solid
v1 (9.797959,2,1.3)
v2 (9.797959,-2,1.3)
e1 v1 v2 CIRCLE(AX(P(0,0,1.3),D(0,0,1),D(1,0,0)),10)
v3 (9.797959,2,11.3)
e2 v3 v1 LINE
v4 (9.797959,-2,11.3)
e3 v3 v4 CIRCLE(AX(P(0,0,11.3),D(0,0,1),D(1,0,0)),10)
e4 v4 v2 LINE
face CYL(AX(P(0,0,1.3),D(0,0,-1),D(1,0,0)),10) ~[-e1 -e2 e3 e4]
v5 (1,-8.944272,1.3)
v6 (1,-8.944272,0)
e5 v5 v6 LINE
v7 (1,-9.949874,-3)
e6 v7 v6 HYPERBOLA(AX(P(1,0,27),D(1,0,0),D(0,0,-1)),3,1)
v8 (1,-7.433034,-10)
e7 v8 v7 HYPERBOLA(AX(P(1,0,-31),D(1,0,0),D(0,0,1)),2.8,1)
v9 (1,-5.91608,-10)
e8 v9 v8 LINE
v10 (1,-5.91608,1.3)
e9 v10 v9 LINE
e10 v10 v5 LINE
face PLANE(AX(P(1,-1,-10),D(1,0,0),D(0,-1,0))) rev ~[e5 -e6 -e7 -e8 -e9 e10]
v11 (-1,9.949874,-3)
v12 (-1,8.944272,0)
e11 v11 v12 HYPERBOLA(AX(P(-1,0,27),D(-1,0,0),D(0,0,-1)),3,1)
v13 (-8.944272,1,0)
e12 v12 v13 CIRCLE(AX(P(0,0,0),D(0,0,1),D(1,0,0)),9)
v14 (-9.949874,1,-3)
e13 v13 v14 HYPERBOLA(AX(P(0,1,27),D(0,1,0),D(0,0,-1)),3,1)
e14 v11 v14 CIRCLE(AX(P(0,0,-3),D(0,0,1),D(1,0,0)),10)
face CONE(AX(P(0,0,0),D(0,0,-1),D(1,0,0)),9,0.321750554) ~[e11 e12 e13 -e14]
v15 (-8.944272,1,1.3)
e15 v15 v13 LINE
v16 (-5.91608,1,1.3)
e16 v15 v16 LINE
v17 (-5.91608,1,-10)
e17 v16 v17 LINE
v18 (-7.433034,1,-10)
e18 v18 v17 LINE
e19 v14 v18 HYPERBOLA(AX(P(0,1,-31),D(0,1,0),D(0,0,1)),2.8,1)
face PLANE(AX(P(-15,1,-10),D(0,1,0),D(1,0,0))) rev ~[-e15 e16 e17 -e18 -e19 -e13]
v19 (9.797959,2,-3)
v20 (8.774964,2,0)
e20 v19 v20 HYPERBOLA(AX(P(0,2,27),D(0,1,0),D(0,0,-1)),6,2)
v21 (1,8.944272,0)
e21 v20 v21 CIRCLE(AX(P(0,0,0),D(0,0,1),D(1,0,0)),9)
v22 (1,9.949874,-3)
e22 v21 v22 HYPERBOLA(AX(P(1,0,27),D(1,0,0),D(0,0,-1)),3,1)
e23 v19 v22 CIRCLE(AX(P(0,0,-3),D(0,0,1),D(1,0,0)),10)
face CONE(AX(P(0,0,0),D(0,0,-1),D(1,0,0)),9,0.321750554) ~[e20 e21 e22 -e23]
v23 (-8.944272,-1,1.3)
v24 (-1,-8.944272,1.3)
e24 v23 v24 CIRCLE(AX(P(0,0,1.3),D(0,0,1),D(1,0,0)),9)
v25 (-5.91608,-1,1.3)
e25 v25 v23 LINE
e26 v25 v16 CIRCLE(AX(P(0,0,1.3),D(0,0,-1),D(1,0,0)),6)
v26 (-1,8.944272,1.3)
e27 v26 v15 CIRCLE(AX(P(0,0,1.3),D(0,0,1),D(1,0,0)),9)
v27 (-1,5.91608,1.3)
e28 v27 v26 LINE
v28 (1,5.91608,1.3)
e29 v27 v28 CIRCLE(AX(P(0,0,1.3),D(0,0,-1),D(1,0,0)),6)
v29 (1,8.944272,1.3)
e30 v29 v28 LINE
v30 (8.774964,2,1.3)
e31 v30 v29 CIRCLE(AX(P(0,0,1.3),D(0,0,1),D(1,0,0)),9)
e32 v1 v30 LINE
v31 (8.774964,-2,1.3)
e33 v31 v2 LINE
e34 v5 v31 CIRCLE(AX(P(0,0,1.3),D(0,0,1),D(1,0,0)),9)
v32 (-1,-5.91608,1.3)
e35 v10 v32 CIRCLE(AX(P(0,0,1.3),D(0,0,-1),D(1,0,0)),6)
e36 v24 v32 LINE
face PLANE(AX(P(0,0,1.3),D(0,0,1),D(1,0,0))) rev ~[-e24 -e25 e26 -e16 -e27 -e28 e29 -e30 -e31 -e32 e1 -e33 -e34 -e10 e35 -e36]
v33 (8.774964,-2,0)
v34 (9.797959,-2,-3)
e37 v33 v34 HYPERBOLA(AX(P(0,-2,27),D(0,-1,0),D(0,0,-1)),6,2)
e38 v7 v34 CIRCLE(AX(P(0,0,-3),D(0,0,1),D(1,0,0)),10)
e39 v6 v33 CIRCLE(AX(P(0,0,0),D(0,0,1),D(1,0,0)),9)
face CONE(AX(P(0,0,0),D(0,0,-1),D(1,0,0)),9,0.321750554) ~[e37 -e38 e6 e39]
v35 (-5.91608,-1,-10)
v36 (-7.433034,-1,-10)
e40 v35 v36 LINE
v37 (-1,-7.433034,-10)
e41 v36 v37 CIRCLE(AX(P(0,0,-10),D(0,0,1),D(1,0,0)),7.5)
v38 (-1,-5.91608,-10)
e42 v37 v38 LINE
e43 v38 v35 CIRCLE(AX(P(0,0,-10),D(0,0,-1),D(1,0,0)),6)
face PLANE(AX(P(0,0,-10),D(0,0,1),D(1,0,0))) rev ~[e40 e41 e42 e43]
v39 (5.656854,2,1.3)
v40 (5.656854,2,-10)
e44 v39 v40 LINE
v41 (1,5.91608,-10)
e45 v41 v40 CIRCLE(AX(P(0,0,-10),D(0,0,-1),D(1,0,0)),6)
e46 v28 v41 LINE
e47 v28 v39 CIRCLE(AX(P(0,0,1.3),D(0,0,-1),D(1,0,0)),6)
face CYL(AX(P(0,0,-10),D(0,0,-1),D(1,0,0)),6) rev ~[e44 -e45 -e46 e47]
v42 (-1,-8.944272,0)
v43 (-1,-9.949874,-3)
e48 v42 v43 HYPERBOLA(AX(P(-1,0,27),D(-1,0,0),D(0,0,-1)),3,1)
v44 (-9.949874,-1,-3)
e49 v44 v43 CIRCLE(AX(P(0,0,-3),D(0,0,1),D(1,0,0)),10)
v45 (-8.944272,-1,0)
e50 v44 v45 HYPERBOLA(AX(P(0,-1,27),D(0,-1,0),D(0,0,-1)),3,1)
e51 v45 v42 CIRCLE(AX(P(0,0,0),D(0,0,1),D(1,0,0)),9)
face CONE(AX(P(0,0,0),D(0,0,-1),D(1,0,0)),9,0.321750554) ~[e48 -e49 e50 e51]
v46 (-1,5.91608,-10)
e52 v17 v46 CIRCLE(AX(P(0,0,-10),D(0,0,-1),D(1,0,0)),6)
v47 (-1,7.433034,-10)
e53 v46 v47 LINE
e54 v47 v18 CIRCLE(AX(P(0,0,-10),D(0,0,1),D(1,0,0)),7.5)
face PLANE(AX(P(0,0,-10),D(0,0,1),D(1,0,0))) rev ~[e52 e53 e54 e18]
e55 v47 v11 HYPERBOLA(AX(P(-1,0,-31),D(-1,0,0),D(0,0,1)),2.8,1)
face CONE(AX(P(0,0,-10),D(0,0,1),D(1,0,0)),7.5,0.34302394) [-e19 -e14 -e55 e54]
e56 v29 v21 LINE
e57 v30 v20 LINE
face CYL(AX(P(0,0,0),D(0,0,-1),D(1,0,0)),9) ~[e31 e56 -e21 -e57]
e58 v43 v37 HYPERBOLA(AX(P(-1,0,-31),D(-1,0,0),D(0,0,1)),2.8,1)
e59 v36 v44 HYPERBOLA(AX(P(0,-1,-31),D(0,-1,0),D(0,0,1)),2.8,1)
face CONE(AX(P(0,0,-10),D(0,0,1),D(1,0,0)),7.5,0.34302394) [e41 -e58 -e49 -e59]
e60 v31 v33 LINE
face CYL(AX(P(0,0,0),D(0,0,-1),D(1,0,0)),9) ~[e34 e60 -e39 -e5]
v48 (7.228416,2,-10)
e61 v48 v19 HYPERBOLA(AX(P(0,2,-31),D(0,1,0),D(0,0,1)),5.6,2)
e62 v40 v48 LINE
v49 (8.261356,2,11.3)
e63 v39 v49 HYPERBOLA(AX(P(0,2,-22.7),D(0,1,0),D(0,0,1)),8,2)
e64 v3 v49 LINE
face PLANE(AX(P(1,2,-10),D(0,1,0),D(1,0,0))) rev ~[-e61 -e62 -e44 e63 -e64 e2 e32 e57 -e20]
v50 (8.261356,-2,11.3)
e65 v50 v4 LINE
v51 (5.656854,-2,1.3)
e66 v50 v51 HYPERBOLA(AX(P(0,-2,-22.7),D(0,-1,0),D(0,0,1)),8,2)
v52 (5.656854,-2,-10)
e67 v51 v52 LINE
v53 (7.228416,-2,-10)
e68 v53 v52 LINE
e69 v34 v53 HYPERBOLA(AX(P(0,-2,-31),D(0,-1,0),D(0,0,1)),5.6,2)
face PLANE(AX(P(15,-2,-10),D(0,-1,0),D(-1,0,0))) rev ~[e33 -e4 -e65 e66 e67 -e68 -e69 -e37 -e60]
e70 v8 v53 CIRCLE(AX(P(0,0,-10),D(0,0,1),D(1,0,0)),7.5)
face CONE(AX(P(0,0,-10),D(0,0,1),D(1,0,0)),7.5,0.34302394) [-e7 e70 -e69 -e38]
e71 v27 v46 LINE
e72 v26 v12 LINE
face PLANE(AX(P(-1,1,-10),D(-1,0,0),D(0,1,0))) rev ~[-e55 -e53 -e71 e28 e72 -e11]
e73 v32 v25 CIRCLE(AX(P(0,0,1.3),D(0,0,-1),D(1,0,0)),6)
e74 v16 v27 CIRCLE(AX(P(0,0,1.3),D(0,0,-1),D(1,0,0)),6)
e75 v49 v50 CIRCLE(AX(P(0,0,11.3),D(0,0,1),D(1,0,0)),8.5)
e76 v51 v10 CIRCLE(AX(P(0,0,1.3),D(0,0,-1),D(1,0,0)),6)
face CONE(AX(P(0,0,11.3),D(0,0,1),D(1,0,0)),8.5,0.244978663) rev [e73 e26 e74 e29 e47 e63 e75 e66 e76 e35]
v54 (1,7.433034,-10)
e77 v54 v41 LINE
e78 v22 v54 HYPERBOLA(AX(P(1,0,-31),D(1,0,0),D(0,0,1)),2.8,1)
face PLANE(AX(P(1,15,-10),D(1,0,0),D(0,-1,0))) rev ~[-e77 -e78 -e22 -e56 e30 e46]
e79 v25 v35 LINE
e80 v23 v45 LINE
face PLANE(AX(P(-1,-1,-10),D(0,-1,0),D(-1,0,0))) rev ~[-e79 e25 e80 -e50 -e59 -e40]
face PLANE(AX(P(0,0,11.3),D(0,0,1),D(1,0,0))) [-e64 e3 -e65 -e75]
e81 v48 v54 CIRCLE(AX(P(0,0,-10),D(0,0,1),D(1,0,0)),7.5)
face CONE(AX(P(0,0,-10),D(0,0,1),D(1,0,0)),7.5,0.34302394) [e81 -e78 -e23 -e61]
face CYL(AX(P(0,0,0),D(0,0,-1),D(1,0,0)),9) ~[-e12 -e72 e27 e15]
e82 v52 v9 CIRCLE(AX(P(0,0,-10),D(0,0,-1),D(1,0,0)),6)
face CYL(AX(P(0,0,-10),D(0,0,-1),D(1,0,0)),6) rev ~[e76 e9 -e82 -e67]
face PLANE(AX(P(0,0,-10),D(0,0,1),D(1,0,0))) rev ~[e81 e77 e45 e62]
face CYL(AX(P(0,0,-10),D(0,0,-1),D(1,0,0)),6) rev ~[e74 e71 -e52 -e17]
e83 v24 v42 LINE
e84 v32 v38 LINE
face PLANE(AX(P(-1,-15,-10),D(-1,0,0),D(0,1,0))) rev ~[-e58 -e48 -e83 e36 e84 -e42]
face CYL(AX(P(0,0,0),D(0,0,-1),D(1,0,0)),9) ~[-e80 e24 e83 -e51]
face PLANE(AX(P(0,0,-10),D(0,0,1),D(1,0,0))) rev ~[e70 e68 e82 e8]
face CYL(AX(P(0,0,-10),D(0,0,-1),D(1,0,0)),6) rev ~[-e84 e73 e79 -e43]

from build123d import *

# Parameters (mm, degrees)
F6_R       = 7.5
F3_R       = 10
F0_R       = 9
F7_FACE_R  = 10
F9_DEPTH   = 1.3
F11_R      = 10
F11_R_2    = 9
F12_DEPTH  = 10
F10_R      = 6
F14_DEPTH  = 11.3
F15_R      = 8.5
F14_FACE_R = 6
F13_W      = 2
F13_H      = 2
F17_DEPTH  = 11.3
F18_DEPTH  = 21.3010001


with BuildPart() as f7:
    # F6 (on plane+point) → F7 section 0
    with BuildSketch(Plane.XY.offset(-10)):
        Circle(F6_R)
    # F3 (on plane+point) → F7 section 1
    with BuildSketch(Plane.XY.offset(-3)):
        Circle(F3_R)
    loft()

    # F0 (on Top) → F8 section 0
    with BuildSketch(Plane.XY):
        Circle(F0_R)
    # F7_face (on face) → F8 section 1
    with BuildSketch(Plane.XY.offset(-3)):
        Circle(F7_FACE_R)
    loft()

    # F9 (add): a face of the model
    f9_faces = [f7.faces().sort_by_distance(p)[0] for p in [
        (0, 0, 0),
    ]]
    extrude(f9_faces, amount=F9_DEPTH)

    # F11 (on face) → F12 (join)
    with BuildSketch(Plane.XY.offset(1.3)):
        Circle(F11_R)
        Circle(F11_R_2, mode=Mode.SUBTRACT)
        Circle(F11_R_2)
    extrude(amount=F12_DEPTH)

    # F10 (on face) → F14 (cut, through all)
    with BuildSketch(Plane(origin=(0, 0, -10), x_dir=(1, 0, 0), z_dir=(0, 0, -1))):
        Circle(F10_R)
    extrude(amount=-F14_DEPTH, mode=Mode.SUBTRACT)

    # F15 (on face) → F16 section 0
    with BuildSketch(Plane.XY.offset(11.3)):
        Circle(F15_R)
    # F14_face (on face) → F16 section 1
    with BuildSketch(Plane(origin=(0, 0, 1.3), x_dir=(1, 0, 0), z_dir=(0, 0, -1))):
        Circle(F14_FACE_R)
    loft(mode=Mode.SUBTRACT)

    # F13 (on face) → F17 (cut, through all)
    with BuildSketch(Plane(origin=(0, 0, -10), x_dir=(1, 0, 0), z_dir=(0, 0, -1))):
        with BuildLine():
            Line((-1, 15), (-1, 7.4330343737))
            ThreePointArc((-1, 7.4330343737), (0, 7.5), (1, 7.4330343737))
            Line((1, 7.4330343737), (1, 15))
            Line((1, 15), (-1, 15))
        make_face()
        with BuildLine():
            Line((-1, 7.4330343737), (-1, 1))
            Line((-1, 1), (1, 1))
            Line((1, 1), (1, 2))
            Line((1, 2), (1, 7.4330343737))
            ThreePointArc((1, 7.4330343737), (0, 7.5), (-1, 7.4330343737))
        make_face()
        with BuildLine():
            Line((15, 1), (7.4330343737, 1))
            ThreePointArc((7.4330343737, 1), (7.4832398666, 0.5011198447), (7.5, 0))
            ThreePointArc((7.5, 0), (7.4832398666, -0.5011198447), (7.4330343737, -1))
            Line((7.4330343737, -1), (15, -1))
            Line((15, -1), (15, 1))
        make_face()
        with BuildLine():
            Line((7.4330343737, 1), (1, 1))
            Line((1, 1), (1, -1))
            Line((1, -1), (7.4330343737, -1))
            ThreePointArc((7.4330343737, -1), (7.4832398666, -0.5011198447), (7.5, 0))
            ThreePointArc((7.5, 0), (7.4832398666, 0.5011198447), (7.4330343737, 1))
        make_face()
        with BuildLine():
            Line((-7.4330343737, 1), (-15, 1))
            Line((-15, 1), (-15, -1))
            Line((-15, -1), (-7.4330343737, -1))
            ThreePointArc((-7.4330343737, -1), (-7.5, 0), (-7.4330343737, 1))
        make_face()
        with BuildLine():
            Line((-1, 1), (-7.4330343737, 1))
            ThreePointArc((-7.4330343737, 1), (-7.5, 0), (-7.4330343737, -1))
            Line((-7.4330343737, -1), (-1, -1))
            Line((-1, -1), (-1, 1))
        make_face()
        Rectangle(F13_W, F13_H)
        with BuildLine():
            Line((1, -1), (-1, -1))
            Line((-1, -1), (-1, -7.4330343737))
            ThreePointArc((-1, -7.4330343737), (0, -7.5), (1, -7.4330343737))
            Line((1, -7.4330343737), (1, -2))
            Line((1, -2), (1, -1))
        make_face()
        with BuildLine():
            ThreePointArc((1, -7.4330343737), (0, -7.5), (-1, -7.4330343737))
            Line((-1, -7.4330343737), (-1, -15))
            Line((-1, -15), (1, -15))
            Line((1, -15), (1, -7.4330343737))
        make_face()
    extrude(amount=-F17_DEPTH, mode=Mode.SUBTRACT)

    # F13 (on face) → F18 (cut, through all)
    with BuildSketch(Plane(origin=(0, 0, -10), x_dir=(1, 0, 0), z_dir=(0, 0, -1))):
        with BuildLine():
            Line((7.4330343737, -1), (1, -1))
            Line((1, -1), (1, -2))
            Line((1, -2), (7.2284161474, -2))
            ThreePointArc((7.2284161474, -2), (7.3477569942, -1.5034850031), (7.4330343737, -1))
        make_face()
        with BuildLine():
            Line((7.4330343737, 1), (1, 1))
            Line((1, 1), (1, -1))
            Line((1, -1), (7.4330343737, -1))
            ThreePointArc((7.4330343737, -1), (7.4832398666, -0.5011198447), (7.5, 0))
            ThreePointArc((7.5, 0), (7.4832398666, 0.5011198447), (7.4330343737, 1))
        make_face()
        with BuildLine():
            Line((1, 2), (1, 1))
            Line((1, 1), (7.4330343737, 1))
            ThreePointArc((7.4330343737, 1), (7.3477569942, 1.5034850031), (7.2284161474, 2))
            Line((7.2284161474, 2), (1, 2))
        make_face()
        with BuildLine():
            ThreePointArc((7.2284161474, 2), (7.3477569942, 1.5034850031), (7.4330343737, 1))
            Line((7.4330343737, 1), (15, 1))
            Line((15, 1), (15, 2))
            Line((15, 2), (7.2284161474, 2))
        make_face()
        with BuildLine():
            Line((15, 1), (7.4330343737, 1))
            ThreePointArc((7.4330343737, 1), (7.4832398666, 0.5011198447), (7.5, 0))
            ThreePointArc((7.5, 0), (7.4832398666, -0.5011198447), (7.4330343737, -1))
            Line((7.4330343737, -1), (15, -1))
            Line((15, -1), (15, 1))
        make_face()
        with BuildLine():
            Line((15, -1), (7.4330343737, -1))
            ThreePointArc((7.4330343737, -1), (7.3477569942, -1.5034850031), (7.2284161474, -2))
            Line((7.2284161474, -2), (15, -2))
            Line((15, -2), (15, -1))
        make_face()
    extrude(amount=-F18_DEPTH, mode=Mode.SUBTRACT)


solid = f7.part
